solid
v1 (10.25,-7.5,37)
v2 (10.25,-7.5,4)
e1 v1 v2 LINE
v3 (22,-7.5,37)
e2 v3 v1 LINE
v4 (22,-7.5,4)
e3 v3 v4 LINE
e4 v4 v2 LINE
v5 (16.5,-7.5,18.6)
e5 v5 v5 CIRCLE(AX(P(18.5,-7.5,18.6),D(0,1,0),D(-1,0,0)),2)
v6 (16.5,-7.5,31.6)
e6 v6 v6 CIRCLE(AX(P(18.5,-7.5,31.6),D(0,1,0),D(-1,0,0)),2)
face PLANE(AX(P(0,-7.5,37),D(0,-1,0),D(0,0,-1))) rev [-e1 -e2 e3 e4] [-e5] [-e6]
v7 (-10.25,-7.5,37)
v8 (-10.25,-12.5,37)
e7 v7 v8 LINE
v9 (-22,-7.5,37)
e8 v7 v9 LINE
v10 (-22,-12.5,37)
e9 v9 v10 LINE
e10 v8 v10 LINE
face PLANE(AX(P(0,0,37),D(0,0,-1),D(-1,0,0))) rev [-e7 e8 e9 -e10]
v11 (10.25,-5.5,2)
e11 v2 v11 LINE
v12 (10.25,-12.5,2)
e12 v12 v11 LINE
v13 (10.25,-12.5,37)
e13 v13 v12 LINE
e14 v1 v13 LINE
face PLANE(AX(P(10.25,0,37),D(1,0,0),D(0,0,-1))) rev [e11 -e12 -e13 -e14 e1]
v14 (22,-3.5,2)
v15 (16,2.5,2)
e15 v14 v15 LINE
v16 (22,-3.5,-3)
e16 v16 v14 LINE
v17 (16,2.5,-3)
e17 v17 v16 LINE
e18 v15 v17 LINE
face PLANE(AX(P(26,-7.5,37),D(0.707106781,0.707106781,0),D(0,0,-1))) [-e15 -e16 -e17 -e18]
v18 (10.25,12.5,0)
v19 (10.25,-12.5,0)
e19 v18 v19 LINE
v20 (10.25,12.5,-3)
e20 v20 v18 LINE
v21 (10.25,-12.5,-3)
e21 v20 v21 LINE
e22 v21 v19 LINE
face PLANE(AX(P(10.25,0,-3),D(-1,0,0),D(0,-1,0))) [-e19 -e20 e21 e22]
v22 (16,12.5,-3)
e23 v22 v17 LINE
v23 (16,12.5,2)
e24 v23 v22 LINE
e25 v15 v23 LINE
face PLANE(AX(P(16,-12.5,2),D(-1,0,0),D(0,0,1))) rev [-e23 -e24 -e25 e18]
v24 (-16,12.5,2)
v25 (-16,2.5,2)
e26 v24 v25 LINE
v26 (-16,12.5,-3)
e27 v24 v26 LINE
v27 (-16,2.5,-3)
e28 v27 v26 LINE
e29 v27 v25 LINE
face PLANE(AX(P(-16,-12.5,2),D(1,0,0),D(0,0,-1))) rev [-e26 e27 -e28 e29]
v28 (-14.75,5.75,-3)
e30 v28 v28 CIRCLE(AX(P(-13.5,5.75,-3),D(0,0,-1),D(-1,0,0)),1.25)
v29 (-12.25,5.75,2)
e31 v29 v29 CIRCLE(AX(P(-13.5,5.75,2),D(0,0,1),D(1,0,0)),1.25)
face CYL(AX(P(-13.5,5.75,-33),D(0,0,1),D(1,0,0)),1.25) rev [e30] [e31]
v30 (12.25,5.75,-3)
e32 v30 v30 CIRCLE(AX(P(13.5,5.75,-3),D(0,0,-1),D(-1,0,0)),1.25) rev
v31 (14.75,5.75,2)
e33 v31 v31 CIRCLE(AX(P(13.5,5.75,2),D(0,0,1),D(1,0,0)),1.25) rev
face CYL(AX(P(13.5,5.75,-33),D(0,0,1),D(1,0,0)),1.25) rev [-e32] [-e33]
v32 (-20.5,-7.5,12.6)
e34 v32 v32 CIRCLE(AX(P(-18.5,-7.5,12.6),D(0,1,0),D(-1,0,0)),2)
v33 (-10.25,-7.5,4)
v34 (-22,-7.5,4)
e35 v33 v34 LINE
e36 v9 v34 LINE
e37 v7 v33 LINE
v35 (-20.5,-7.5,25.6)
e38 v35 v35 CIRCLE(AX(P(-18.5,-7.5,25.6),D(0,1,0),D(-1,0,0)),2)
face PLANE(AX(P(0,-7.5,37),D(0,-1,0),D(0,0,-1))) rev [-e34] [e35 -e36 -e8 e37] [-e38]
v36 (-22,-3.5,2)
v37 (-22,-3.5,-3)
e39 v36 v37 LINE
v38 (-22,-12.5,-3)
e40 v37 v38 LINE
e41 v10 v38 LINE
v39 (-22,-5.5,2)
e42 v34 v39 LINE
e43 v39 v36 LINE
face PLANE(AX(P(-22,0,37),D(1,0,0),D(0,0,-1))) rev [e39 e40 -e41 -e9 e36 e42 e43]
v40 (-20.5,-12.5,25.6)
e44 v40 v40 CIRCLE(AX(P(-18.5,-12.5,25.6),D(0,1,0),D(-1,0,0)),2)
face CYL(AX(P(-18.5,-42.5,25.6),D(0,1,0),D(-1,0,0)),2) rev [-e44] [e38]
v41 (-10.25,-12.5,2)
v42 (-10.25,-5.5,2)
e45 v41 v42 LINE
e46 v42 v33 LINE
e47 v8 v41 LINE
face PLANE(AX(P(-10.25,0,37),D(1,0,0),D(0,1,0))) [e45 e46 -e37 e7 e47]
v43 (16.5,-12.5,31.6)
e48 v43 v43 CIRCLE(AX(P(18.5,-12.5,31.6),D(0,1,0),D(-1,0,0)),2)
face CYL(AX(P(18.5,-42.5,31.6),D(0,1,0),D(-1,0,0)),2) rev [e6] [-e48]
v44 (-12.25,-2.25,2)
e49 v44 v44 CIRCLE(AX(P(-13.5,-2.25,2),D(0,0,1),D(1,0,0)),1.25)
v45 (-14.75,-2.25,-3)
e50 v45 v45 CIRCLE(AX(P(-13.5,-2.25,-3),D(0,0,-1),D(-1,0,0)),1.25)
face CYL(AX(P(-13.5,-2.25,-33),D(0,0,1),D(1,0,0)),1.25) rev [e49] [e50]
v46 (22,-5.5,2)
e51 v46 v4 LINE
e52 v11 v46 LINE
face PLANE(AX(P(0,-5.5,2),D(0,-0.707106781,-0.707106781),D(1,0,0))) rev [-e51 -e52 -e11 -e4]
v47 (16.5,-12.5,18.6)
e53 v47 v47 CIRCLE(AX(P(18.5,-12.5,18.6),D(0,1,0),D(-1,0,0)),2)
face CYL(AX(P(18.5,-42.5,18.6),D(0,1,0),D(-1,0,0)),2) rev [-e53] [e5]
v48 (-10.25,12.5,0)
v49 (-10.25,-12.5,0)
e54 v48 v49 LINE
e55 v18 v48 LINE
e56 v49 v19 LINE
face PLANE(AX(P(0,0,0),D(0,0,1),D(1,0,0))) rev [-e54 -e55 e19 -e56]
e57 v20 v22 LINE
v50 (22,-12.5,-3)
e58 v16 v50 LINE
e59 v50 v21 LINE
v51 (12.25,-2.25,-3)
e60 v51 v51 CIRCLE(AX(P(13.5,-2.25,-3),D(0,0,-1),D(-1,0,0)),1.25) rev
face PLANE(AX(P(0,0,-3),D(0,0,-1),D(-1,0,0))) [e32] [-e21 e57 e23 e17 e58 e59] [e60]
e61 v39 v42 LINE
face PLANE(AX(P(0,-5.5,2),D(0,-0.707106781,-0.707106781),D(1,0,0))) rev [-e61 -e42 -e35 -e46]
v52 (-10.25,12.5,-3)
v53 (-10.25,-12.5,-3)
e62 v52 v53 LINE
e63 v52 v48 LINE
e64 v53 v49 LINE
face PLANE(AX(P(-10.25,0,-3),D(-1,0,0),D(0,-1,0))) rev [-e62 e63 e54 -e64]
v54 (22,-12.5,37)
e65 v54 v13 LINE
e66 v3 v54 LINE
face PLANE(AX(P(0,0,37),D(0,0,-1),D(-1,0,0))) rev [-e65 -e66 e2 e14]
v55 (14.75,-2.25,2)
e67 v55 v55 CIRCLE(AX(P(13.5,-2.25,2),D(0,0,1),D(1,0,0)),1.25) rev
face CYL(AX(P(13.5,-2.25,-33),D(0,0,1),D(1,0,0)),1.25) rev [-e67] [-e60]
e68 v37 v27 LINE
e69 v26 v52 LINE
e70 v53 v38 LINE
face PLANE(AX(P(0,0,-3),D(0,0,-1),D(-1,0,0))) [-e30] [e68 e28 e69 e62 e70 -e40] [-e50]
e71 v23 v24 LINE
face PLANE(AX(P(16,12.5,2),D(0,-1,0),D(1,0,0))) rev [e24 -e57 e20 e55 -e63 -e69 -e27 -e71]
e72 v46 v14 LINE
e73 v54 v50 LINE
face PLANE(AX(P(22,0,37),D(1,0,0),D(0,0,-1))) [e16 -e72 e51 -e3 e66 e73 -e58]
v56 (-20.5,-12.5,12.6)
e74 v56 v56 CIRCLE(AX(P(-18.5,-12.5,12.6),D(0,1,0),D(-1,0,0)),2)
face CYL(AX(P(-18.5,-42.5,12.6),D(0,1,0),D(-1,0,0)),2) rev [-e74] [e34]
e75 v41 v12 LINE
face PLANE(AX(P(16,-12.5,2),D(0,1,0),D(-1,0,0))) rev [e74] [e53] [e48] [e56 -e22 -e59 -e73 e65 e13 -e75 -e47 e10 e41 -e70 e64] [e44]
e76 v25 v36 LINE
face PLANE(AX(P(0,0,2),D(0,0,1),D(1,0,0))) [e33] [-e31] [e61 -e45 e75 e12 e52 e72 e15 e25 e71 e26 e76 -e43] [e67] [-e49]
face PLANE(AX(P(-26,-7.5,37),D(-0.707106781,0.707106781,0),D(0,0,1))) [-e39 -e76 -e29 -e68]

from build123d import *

# Parameters (mm, degrees)
SZKIC1_W                    = 32
SZKIC1_H                    = 25
DODANIE_WYCI_GNI_CIE1_DEPTH = 2
SZKIC2_W                    = 5.75
SZKIC2_H                    = 25
DODANIE_WYCI_GNI_CIE2_DEPTH = 3
SZKIC4_W                    = 11.75
SZKIC4_H                    = 5
SZKIC4_W_2                  = 6
SZKIC4_W_3                  = 5.75
DODANIE_WYCI_GNI_CIE3_DEPTH = 40
SZKIC5_R                    = 1.25
WYTNIJ_WYCI_GNI_CIE1_DEPTH  = 35
SZKIC7_R                    = 2
WYTNIJ_WYCI_GNI_CIE2_DEPTH  = 35
SFAZOWANIE1_SIZE            = 10
SFAZOWANIE2_SIZE            = 2


with BuildPart() as part:
    # Szkic1 → Dodanie-wyciągnięcie1 (new body)
    with BuildSketch(Plane.XY):
        Rectangle(SZKIC1_W, SZKIC1_H)
    extrude(amount=DODANIE_WYCI_GNI_CIE1_DEPTH)

    # Szkic2 → Dodanie-wyciągnięcie2 (add)
    with BuildSketch(Plane(origin=(0, 0, 0), x_dir=(-1, 0, 0), z_dir=(0, 0, -1))):
        with Locations((-13.125, 0)):
            Rectangle(SZKIC2_W, SZKIC2_H)
        with Locations((13.125, 0)):
            Rectangle(SZKIC2_W, SZKIC2_H)
    extrude(amount=DODANIE_WYCI_GNI_CIE2_DEPTH)

    # Szkic4 → Dodanie-wyciągnięcie3 (add)
    with BuildSketch(Plane(origin=(0, 0, -3), x_dir=(-1, 0, 0), z_dir=(0, 0, -1))):
        with Locations((-16.125, -10)):
            Rectangle(SZKIC4_W, SZKIC4_H)
        with Locations((19, -10)):
            Rectangle(SZKIC4_W_2, SZKIC4_H)
        with Locations((13.125, -10)):
            Rectangle(SZKIC4_W_3, SZKIC4_H)
    extrude(amount=-DODANIE_WYCI_GNI_CIE3_DEPTH)

    # Szkic5 → Wytnij-wyciągnięcie1 (cut)
    with BuildSketch(Plane.XY.offset(2)):
        with Locations((-13.5, 5.75)):
            Circle(SZKIC5_R)
        with Locations((-13.5, -2.25)):
            Circle(SZKIC5_R)
        with Locations((13.5, -2.25)):
            Circle(SZKIC5_R)
        with Locations((13.5, 5.75)):
            Circle(SZKIC5_R)
    extrude(amount=-WYTNIJ_WYCI_GNI_CIE1_DEPTH, mode=Mode.SUBTRACT)

    # Szkic7 → Wytnij-wyciągnięcie2 (cut)
    with BuildSketch(Plane(origin=(0, -7.5, 0), x_dir=(1, 0, 0), z_dir=(0, 1, 0))):
        with Locations(Location((18.5, -31.6, 0), (0, 0, 180))):
            Circle(SZKIC7_R)
        with Locations(Location((18.5, -18.6, 0), (0, 0, 180))):
            Circle(SZKIC7_R)
        with Locations(Location((-18.5, -25.6, 0), (0, 0, 180))):
            Circle(SZKIC7_R)
        with Locations(Location((-18.5, -12.6, 0), (0, 0, 180))):
            Circle(SZKIC7_R)
    extrude(amount=-WYTNIJ_WYCI_GNI_CIE2_DEPTH, mode=Mode.SUBTRACT)

    # Sfazowanie1
    # the kernel refuses this chamfer: 10 mm, written as the material it adds along each edge
    with BuildSketch(Plane(origin=(16, -7.5, -3), x_dir=(0.9996219169112968, -0.027495876610586317, 0), z_dir=(0, 0, 1))) as sfazowanie1_piece_1_section:
        Polygon((SFAZOWANIE1_SIZE * 0.999621916911, SFAZOWANIE1_SIZE * 0.0274958766106), (-SFAZOWANIE1_SIZE * 0.0274958766106, SFAZOWANIE1_SIZE * 0.999621916911), (0, 0), align=None)
    sfazowanie1_piece_1 = extrude(amount=5, mode=Mode.PRIVATE)
    sfazowanie1_piece_1 = split(sfazowanie1_piece_1, bisect_by=Plane(origin=(22, -3.749905405, -0.5), z_dir=(-1, 0, 0)), keep=Keep.TOP, mode=Mode.PRIVATE)
    add(sfazowanie1_piece_1)
    with BuildSketch(Plane(origin=(-16, -7.5, 2), x_dir=(-0.9996219169112968, -0.027495876610586403, 0), z_dir=(0, 0, -1))) as sfazowanie1_piece_2_section:
        Polygon((SFAZOWANIE1_SIZE * 0.999621916911, SFAZOWANIE1_SIZE * 0.0274958766106), (-SFAZOWANIE1_SIZE * 0.0274958766106, SFAZOWANIE1_SIZE * 0.999621916911), (0, 0), align=None)
    sfazowanie1_piece_2 = extrude(amount=5, mode=Mode.PRIVATE)
    sfazowanie1_piece_2 = split(sfazowanie1_piece_2, bisect_by=Plane(origin=(-22, -3.749905405, -0.5), z_dir=(1, 0, 0)), keep=Keep.TOP, mode=Mode.PRIVATE)
    add(sfazowanie1_piece_2)

    # Sfazowanie2
    sfazowanie2_edges = [part.edges().sort_by_distance(p)[0] for p in [
        (16.125, -7.5, 2),
        (-16.125, -7.5, 2),
    ]]
    chamfer(sfazowanie2_edges, length=SFAZOWANIE2_SIZE)


solid = part.part
